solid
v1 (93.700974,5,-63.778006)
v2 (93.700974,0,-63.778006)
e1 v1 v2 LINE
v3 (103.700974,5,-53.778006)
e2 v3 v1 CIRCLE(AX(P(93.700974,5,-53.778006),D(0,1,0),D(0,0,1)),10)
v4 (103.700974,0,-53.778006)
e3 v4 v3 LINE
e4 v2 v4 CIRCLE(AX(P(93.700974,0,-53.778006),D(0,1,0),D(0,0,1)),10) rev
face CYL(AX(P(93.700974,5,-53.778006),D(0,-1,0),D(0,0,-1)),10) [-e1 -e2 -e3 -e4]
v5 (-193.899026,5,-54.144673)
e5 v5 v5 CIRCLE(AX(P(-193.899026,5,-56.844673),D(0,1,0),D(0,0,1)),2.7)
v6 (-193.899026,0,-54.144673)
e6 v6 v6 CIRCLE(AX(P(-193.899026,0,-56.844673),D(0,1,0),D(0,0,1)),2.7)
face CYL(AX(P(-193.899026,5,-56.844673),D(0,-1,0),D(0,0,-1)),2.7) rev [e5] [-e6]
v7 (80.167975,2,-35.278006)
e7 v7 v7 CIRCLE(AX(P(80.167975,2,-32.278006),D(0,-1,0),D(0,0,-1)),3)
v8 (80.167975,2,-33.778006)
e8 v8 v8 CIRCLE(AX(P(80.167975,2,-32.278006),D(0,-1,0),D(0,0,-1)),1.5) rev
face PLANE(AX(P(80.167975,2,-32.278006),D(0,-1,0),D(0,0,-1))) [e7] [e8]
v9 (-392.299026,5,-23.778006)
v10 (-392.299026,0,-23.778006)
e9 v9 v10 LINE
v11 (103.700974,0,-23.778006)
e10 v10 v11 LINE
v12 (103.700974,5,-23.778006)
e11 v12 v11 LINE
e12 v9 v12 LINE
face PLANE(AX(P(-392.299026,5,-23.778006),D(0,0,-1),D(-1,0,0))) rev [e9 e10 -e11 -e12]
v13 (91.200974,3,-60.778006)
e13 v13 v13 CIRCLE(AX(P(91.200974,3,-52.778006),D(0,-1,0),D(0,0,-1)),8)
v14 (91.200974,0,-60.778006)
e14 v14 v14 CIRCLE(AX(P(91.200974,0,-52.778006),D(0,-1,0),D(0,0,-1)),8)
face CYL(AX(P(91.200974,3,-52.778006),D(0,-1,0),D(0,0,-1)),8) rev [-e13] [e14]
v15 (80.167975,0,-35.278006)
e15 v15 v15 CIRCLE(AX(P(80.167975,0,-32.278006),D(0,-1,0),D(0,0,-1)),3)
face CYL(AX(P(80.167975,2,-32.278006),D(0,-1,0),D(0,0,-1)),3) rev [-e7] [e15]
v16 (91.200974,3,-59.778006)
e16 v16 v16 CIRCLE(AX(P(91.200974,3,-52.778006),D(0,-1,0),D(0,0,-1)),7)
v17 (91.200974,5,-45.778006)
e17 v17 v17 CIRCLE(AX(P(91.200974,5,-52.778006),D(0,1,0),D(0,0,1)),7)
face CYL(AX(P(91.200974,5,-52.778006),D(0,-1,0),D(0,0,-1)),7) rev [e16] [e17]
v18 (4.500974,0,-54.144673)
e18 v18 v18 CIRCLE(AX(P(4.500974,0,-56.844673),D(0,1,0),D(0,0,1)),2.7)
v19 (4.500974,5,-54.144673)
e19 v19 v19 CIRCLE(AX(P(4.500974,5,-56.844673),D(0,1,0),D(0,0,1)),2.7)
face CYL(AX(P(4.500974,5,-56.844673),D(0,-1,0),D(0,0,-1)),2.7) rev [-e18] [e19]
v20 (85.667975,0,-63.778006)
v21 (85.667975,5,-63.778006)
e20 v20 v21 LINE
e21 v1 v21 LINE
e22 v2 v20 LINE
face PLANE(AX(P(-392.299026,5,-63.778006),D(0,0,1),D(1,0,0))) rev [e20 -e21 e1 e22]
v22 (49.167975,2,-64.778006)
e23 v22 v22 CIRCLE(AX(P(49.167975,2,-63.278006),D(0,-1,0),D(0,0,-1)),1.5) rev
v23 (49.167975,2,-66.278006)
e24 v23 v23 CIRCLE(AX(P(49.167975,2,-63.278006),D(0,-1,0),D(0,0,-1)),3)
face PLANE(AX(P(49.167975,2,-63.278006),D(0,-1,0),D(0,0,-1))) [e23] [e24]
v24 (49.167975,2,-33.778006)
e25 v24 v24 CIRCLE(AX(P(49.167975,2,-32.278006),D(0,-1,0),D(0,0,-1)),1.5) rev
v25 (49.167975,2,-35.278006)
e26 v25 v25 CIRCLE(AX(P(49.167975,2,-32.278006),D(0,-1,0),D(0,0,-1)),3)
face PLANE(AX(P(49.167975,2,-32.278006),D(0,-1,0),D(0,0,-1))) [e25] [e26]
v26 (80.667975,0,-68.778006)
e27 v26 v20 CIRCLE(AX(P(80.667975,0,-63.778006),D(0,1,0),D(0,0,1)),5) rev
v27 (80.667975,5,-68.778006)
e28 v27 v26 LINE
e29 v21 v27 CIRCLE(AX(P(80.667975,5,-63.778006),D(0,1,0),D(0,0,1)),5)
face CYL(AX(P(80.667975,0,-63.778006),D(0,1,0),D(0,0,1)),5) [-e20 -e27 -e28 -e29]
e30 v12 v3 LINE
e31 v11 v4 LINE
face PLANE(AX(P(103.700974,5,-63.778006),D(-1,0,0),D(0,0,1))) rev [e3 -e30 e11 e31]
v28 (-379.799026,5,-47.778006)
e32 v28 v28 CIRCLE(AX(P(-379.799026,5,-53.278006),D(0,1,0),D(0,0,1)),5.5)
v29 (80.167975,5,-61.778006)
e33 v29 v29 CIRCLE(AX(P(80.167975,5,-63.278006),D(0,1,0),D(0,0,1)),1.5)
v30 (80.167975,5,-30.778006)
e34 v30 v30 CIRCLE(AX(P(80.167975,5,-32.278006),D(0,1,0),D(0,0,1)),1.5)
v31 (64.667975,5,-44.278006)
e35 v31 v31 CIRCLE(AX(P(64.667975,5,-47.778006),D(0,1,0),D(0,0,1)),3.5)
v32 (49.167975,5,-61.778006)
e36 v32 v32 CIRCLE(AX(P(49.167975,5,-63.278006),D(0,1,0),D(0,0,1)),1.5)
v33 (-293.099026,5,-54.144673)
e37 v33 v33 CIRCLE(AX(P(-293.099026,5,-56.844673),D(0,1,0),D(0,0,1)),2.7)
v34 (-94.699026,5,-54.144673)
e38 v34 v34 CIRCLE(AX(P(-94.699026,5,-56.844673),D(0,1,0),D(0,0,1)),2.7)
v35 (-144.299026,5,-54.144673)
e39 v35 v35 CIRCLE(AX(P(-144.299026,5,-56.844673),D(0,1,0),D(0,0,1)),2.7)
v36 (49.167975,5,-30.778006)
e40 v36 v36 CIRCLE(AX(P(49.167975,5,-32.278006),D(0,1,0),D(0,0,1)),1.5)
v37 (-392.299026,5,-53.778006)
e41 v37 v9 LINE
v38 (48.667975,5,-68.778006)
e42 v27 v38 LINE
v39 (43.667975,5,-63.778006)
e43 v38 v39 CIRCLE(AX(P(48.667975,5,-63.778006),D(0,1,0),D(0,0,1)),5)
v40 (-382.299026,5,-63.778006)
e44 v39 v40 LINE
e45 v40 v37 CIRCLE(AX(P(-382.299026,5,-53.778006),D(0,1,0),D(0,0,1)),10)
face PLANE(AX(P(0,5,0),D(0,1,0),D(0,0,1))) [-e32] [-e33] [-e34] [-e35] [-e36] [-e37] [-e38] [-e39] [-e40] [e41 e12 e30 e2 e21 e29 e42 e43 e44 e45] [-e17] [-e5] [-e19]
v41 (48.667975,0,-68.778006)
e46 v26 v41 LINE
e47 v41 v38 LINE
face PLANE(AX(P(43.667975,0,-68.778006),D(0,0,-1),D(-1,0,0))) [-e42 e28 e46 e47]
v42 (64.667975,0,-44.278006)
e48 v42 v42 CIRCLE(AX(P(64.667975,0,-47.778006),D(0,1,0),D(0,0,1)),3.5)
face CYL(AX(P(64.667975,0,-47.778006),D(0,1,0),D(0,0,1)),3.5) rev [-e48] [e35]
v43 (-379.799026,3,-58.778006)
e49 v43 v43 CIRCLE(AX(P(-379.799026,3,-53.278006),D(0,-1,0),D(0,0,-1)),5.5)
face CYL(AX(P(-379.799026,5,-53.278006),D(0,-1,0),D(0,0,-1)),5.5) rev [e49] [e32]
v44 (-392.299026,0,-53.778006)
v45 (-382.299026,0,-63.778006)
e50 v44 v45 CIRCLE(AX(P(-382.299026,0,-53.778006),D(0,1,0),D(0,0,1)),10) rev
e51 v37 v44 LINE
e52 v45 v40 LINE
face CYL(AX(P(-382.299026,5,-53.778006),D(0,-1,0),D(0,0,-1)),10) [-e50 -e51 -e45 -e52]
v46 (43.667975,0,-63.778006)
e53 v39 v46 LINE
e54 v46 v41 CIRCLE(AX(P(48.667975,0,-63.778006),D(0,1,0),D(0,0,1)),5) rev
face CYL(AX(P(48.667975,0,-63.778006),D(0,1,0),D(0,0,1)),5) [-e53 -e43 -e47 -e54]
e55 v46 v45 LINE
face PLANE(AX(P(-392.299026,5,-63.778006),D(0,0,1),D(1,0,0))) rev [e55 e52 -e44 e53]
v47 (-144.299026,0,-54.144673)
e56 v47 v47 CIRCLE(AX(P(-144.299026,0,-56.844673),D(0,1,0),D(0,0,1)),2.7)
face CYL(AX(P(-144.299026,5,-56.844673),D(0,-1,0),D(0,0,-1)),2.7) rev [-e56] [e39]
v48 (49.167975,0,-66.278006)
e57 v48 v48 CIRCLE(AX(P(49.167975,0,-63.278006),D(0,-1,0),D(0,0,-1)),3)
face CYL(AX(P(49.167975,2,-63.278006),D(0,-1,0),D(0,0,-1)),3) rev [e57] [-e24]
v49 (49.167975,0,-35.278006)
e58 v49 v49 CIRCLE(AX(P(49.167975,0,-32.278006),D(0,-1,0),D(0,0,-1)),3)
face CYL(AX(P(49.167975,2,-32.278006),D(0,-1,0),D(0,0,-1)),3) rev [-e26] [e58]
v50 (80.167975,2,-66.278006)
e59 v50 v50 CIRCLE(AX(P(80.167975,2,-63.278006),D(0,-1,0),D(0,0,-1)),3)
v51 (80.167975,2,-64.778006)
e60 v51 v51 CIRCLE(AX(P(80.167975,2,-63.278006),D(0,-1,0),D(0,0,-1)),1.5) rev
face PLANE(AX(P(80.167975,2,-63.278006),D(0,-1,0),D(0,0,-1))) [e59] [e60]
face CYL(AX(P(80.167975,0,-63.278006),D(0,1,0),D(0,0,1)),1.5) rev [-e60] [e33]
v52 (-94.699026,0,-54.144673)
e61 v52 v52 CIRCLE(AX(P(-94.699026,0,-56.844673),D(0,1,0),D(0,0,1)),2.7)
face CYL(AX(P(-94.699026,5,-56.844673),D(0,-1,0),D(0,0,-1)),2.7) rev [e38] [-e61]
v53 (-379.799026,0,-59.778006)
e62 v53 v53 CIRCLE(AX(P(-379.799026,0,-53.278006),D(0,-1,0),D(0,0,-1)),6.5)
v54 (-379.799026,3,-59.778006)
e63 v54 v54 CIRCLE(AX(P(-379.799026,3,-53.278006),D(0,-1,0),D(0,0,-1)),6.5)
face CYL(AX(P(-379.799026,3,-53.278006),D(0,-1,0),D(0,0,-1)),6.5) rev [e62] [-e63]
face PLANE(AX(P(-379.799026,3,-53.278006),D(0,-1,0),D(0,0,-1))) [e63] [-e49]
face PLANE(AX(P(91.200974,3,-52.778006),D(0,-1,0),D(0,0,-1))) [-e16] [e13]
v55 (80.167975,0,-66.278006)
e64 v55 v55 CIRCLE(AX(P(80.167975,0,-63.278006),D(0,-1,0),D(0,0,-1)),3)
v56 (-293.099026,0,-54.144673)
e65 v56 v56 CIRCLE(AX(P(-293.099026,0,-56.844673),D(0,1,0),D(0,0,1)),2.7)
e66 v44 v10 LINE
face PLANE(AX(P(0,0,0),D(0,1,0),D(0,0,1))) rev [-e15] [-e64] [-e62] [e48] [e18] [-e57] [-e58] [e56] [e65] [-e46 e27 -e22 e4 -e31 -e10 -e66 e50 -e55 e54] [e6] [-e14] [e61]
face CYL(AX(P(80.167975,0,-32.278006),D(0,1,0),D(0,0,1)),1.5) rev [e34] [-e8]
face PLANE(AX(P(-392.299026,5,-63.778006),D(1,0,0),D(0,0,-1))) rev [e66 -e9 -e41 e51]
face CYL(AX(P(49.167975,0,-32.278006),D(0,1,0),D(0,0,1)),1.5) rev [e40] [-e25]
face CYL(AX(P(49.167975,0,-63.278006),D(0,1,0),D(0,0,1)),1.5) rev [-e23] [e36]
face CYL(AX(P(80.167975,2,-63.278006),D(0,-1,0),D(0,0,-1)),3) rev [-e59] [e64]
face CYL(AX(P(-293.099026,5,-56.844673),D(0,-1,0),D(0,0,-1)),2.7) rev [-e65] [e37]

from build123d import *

# Parameters (mm, degrees)
SKETCH1_W           = 496
SKETCH1_H           = 40
SKETCH1_R           = 5.5
SKETCH1_R_2         = 7
SKETCH1_R_3         = 2.7
BOSS_EXTRUDE1_DEPTH = 5
SKETCH2_R           = 6.5
SKETCH2_R_2         = 8
CUT_EXTRUDE1_DEPTH  = 3
FILLET1_R           = 10
SKETCH3_W           = 42
SKETCH3_H           = 9.695245244
BOSS_EXTRUDE2_DEPTH = 5
SKETCH5_R           = 3.5
SKETCH5_R_2         = 1.5
CUT_EXTRUDE2_DEPTH  = 5
FILLET2_R           = 5
SKETCH6_R           = 3
CUT_EXTRUDE3_DEPTH  = 2


with BuildPart() as part:
    # Sketch1 → Boss-Extrude1 (new body)
    with BuildSketch(Plane(origin=(0, 0, 0), x_dir=(1, 0, 0), z_dir=(0, 1, 0))):
        with Locations((-144.299026304, 43.778006447)):
            Rectangle(SKETCH1_W, SKETCH1_H)
        with Locations(Location((-379.799026304, 53.278006447, 0), (0, 0, 270))):
            Circle(SKETCH1_R, mode=Mode.SUBTRACT)
        with Locations(Location((91.200973696, 52.778006447, 0), (0, 0, 270))):
            Circle(SKETCH1_R_2, mode=Mode.SUBTRACT)
        with Locations(Location((-293.099026304, 56.844673113, 0), (0, 0, 270))):
            Circle(SKETCH1_R_3, mode=Mode.SUBTRACT)
        with Locations(Location((-193.899026304, 56.844673113, 0), (0, 0, 270))):
            Circle(SKETCH1_R_3, mode=Mode.SUBTRACT)
        with Locations(Location((-94.699026304, 56.844673113, 0), (0, 0, 270))):
            Circle(SKETCH1_R_3, mode=Mode.SUBTRACT)
        with Locations(Location((4.500973696, 56.844673113, 0), (0, 0, 270))):
            Circle(SKETCH1_R_3, mode=Mode.SUBTRACT)
        with Locations(Location((-144.299026304, 56.844673113, 0), (0, 0, 270))):
            Circle(SKETCH1_R_3, mode=Mode.SUBTRACT)
    extrude(amount=BOSS_EXTRUDE1_DEPTH)

    # Sketch2 → Cut-Extrude1 (cut)
    with BuildSketch(Plane.XZ):
        with Locations(Location((-379.799026304, -53.278006447, 0), (0, 0, 270))):
            Circle(SKETCH2_R)
        with Locations(Location((91.200973696, -52.778006447, 0), (0, 0, 270))):
            Circle(SKETCH2_R_2)
    extrude(amount=-CUT_EXTRUDE1_DEPTH, mode=Mode.SUBTRACT)

    # Fillet1
    fillet1_edges = [part.edges().sort_by_distance(p)[0] for p in [
        (-392.299026304, 2.5, -63.778006447),
        (103.700973696, 2.5, -63.778006447),
    ]]
    fillet(fillet1_edges, radius=FILLET1_R)

    # Sketch3 → Boss-Extrude2 (add)
    with BuildSketch(Plane(origin=(0, 5, 0), x_dir=(1, 0, 0), z_dir=(0, 1, 0))):
        with Locations((64.667975373, 63.930383825)):
            Rectangle(SKETCH3_W, SKETCH3_H)
    extrude(amount=-BOSS_EXTRUDE2_DEPTH)

    # Sketch5 → Cut-Extrude2 (cut)
    with BuildSketch(Plane(origin=(0, 5, 0), x_dir=(1, 0, 0), z_dir=(0, 1, 0))):
        with Locations(Location((64.667975373, 47.778006447, 0), (0, 0, 270))):
            Circle(SKETCH5_R)
        with Locations(Location((49.167975373, 63.278006447, 0), (0, 0, 270))):
            Circle(SKETCH5_R_2)
        with Locations(Location((80.167975373, 63.278006447, 0), (0, 0, 270))):
            Circle(SKETCH5_R_2)
        with Locations(Location((80.167975373, 32.278006447, 0), (0, 0, 270))):
            Circle(SKETCH5_R_2)
        with Locations(Location((49.167975373, 32.278006447, 0), (0, 0, 270))):
            Circle(SKETCH5_R_2)
    extrude(amount=-CUT_EXTRUDE2_DEPTH, mode=Mode.SUBTRACT)

    # Fillet2
    fillet2_edges = [part.edges().sort_by_distance(p)[0] for p in [
        (43.667975373, 2.5, -68.778006447),
        (85.667975373, 2.5, -68.778006447),
    ]]
    fillet(fillet2_edges, radius=FILLET2_R - 0.0001)  # a hair under: the kernel refuses the full size

    # Sketch6 → Cut-Extrude3 (cut)
    with BuildSketch(Plane.XZ):
        with Locations(Location((49.167975373, -32.278006447, 0), (0, 0, 270))):
            Circle(SKETCH6_R)
        with Locations(Location((80.167975373, -32.278006447, 0), (0, 0, 270))):
            Circle(SKETCH6_R)
        with Locations(Location((49.167975373, -63.278006447, 0), (0, 0, 270))):
            Circle(SKETCH6_R)
        with Locations(Location((80.167975373, -63.278006447, 0), (0, 0, 270))):
            Circle(SKETCH6_R)
    extrude(amount=-CUT_EXTRUDE3_DEPTH, mode=Mode.SUBTRACT)


solid = part.part
